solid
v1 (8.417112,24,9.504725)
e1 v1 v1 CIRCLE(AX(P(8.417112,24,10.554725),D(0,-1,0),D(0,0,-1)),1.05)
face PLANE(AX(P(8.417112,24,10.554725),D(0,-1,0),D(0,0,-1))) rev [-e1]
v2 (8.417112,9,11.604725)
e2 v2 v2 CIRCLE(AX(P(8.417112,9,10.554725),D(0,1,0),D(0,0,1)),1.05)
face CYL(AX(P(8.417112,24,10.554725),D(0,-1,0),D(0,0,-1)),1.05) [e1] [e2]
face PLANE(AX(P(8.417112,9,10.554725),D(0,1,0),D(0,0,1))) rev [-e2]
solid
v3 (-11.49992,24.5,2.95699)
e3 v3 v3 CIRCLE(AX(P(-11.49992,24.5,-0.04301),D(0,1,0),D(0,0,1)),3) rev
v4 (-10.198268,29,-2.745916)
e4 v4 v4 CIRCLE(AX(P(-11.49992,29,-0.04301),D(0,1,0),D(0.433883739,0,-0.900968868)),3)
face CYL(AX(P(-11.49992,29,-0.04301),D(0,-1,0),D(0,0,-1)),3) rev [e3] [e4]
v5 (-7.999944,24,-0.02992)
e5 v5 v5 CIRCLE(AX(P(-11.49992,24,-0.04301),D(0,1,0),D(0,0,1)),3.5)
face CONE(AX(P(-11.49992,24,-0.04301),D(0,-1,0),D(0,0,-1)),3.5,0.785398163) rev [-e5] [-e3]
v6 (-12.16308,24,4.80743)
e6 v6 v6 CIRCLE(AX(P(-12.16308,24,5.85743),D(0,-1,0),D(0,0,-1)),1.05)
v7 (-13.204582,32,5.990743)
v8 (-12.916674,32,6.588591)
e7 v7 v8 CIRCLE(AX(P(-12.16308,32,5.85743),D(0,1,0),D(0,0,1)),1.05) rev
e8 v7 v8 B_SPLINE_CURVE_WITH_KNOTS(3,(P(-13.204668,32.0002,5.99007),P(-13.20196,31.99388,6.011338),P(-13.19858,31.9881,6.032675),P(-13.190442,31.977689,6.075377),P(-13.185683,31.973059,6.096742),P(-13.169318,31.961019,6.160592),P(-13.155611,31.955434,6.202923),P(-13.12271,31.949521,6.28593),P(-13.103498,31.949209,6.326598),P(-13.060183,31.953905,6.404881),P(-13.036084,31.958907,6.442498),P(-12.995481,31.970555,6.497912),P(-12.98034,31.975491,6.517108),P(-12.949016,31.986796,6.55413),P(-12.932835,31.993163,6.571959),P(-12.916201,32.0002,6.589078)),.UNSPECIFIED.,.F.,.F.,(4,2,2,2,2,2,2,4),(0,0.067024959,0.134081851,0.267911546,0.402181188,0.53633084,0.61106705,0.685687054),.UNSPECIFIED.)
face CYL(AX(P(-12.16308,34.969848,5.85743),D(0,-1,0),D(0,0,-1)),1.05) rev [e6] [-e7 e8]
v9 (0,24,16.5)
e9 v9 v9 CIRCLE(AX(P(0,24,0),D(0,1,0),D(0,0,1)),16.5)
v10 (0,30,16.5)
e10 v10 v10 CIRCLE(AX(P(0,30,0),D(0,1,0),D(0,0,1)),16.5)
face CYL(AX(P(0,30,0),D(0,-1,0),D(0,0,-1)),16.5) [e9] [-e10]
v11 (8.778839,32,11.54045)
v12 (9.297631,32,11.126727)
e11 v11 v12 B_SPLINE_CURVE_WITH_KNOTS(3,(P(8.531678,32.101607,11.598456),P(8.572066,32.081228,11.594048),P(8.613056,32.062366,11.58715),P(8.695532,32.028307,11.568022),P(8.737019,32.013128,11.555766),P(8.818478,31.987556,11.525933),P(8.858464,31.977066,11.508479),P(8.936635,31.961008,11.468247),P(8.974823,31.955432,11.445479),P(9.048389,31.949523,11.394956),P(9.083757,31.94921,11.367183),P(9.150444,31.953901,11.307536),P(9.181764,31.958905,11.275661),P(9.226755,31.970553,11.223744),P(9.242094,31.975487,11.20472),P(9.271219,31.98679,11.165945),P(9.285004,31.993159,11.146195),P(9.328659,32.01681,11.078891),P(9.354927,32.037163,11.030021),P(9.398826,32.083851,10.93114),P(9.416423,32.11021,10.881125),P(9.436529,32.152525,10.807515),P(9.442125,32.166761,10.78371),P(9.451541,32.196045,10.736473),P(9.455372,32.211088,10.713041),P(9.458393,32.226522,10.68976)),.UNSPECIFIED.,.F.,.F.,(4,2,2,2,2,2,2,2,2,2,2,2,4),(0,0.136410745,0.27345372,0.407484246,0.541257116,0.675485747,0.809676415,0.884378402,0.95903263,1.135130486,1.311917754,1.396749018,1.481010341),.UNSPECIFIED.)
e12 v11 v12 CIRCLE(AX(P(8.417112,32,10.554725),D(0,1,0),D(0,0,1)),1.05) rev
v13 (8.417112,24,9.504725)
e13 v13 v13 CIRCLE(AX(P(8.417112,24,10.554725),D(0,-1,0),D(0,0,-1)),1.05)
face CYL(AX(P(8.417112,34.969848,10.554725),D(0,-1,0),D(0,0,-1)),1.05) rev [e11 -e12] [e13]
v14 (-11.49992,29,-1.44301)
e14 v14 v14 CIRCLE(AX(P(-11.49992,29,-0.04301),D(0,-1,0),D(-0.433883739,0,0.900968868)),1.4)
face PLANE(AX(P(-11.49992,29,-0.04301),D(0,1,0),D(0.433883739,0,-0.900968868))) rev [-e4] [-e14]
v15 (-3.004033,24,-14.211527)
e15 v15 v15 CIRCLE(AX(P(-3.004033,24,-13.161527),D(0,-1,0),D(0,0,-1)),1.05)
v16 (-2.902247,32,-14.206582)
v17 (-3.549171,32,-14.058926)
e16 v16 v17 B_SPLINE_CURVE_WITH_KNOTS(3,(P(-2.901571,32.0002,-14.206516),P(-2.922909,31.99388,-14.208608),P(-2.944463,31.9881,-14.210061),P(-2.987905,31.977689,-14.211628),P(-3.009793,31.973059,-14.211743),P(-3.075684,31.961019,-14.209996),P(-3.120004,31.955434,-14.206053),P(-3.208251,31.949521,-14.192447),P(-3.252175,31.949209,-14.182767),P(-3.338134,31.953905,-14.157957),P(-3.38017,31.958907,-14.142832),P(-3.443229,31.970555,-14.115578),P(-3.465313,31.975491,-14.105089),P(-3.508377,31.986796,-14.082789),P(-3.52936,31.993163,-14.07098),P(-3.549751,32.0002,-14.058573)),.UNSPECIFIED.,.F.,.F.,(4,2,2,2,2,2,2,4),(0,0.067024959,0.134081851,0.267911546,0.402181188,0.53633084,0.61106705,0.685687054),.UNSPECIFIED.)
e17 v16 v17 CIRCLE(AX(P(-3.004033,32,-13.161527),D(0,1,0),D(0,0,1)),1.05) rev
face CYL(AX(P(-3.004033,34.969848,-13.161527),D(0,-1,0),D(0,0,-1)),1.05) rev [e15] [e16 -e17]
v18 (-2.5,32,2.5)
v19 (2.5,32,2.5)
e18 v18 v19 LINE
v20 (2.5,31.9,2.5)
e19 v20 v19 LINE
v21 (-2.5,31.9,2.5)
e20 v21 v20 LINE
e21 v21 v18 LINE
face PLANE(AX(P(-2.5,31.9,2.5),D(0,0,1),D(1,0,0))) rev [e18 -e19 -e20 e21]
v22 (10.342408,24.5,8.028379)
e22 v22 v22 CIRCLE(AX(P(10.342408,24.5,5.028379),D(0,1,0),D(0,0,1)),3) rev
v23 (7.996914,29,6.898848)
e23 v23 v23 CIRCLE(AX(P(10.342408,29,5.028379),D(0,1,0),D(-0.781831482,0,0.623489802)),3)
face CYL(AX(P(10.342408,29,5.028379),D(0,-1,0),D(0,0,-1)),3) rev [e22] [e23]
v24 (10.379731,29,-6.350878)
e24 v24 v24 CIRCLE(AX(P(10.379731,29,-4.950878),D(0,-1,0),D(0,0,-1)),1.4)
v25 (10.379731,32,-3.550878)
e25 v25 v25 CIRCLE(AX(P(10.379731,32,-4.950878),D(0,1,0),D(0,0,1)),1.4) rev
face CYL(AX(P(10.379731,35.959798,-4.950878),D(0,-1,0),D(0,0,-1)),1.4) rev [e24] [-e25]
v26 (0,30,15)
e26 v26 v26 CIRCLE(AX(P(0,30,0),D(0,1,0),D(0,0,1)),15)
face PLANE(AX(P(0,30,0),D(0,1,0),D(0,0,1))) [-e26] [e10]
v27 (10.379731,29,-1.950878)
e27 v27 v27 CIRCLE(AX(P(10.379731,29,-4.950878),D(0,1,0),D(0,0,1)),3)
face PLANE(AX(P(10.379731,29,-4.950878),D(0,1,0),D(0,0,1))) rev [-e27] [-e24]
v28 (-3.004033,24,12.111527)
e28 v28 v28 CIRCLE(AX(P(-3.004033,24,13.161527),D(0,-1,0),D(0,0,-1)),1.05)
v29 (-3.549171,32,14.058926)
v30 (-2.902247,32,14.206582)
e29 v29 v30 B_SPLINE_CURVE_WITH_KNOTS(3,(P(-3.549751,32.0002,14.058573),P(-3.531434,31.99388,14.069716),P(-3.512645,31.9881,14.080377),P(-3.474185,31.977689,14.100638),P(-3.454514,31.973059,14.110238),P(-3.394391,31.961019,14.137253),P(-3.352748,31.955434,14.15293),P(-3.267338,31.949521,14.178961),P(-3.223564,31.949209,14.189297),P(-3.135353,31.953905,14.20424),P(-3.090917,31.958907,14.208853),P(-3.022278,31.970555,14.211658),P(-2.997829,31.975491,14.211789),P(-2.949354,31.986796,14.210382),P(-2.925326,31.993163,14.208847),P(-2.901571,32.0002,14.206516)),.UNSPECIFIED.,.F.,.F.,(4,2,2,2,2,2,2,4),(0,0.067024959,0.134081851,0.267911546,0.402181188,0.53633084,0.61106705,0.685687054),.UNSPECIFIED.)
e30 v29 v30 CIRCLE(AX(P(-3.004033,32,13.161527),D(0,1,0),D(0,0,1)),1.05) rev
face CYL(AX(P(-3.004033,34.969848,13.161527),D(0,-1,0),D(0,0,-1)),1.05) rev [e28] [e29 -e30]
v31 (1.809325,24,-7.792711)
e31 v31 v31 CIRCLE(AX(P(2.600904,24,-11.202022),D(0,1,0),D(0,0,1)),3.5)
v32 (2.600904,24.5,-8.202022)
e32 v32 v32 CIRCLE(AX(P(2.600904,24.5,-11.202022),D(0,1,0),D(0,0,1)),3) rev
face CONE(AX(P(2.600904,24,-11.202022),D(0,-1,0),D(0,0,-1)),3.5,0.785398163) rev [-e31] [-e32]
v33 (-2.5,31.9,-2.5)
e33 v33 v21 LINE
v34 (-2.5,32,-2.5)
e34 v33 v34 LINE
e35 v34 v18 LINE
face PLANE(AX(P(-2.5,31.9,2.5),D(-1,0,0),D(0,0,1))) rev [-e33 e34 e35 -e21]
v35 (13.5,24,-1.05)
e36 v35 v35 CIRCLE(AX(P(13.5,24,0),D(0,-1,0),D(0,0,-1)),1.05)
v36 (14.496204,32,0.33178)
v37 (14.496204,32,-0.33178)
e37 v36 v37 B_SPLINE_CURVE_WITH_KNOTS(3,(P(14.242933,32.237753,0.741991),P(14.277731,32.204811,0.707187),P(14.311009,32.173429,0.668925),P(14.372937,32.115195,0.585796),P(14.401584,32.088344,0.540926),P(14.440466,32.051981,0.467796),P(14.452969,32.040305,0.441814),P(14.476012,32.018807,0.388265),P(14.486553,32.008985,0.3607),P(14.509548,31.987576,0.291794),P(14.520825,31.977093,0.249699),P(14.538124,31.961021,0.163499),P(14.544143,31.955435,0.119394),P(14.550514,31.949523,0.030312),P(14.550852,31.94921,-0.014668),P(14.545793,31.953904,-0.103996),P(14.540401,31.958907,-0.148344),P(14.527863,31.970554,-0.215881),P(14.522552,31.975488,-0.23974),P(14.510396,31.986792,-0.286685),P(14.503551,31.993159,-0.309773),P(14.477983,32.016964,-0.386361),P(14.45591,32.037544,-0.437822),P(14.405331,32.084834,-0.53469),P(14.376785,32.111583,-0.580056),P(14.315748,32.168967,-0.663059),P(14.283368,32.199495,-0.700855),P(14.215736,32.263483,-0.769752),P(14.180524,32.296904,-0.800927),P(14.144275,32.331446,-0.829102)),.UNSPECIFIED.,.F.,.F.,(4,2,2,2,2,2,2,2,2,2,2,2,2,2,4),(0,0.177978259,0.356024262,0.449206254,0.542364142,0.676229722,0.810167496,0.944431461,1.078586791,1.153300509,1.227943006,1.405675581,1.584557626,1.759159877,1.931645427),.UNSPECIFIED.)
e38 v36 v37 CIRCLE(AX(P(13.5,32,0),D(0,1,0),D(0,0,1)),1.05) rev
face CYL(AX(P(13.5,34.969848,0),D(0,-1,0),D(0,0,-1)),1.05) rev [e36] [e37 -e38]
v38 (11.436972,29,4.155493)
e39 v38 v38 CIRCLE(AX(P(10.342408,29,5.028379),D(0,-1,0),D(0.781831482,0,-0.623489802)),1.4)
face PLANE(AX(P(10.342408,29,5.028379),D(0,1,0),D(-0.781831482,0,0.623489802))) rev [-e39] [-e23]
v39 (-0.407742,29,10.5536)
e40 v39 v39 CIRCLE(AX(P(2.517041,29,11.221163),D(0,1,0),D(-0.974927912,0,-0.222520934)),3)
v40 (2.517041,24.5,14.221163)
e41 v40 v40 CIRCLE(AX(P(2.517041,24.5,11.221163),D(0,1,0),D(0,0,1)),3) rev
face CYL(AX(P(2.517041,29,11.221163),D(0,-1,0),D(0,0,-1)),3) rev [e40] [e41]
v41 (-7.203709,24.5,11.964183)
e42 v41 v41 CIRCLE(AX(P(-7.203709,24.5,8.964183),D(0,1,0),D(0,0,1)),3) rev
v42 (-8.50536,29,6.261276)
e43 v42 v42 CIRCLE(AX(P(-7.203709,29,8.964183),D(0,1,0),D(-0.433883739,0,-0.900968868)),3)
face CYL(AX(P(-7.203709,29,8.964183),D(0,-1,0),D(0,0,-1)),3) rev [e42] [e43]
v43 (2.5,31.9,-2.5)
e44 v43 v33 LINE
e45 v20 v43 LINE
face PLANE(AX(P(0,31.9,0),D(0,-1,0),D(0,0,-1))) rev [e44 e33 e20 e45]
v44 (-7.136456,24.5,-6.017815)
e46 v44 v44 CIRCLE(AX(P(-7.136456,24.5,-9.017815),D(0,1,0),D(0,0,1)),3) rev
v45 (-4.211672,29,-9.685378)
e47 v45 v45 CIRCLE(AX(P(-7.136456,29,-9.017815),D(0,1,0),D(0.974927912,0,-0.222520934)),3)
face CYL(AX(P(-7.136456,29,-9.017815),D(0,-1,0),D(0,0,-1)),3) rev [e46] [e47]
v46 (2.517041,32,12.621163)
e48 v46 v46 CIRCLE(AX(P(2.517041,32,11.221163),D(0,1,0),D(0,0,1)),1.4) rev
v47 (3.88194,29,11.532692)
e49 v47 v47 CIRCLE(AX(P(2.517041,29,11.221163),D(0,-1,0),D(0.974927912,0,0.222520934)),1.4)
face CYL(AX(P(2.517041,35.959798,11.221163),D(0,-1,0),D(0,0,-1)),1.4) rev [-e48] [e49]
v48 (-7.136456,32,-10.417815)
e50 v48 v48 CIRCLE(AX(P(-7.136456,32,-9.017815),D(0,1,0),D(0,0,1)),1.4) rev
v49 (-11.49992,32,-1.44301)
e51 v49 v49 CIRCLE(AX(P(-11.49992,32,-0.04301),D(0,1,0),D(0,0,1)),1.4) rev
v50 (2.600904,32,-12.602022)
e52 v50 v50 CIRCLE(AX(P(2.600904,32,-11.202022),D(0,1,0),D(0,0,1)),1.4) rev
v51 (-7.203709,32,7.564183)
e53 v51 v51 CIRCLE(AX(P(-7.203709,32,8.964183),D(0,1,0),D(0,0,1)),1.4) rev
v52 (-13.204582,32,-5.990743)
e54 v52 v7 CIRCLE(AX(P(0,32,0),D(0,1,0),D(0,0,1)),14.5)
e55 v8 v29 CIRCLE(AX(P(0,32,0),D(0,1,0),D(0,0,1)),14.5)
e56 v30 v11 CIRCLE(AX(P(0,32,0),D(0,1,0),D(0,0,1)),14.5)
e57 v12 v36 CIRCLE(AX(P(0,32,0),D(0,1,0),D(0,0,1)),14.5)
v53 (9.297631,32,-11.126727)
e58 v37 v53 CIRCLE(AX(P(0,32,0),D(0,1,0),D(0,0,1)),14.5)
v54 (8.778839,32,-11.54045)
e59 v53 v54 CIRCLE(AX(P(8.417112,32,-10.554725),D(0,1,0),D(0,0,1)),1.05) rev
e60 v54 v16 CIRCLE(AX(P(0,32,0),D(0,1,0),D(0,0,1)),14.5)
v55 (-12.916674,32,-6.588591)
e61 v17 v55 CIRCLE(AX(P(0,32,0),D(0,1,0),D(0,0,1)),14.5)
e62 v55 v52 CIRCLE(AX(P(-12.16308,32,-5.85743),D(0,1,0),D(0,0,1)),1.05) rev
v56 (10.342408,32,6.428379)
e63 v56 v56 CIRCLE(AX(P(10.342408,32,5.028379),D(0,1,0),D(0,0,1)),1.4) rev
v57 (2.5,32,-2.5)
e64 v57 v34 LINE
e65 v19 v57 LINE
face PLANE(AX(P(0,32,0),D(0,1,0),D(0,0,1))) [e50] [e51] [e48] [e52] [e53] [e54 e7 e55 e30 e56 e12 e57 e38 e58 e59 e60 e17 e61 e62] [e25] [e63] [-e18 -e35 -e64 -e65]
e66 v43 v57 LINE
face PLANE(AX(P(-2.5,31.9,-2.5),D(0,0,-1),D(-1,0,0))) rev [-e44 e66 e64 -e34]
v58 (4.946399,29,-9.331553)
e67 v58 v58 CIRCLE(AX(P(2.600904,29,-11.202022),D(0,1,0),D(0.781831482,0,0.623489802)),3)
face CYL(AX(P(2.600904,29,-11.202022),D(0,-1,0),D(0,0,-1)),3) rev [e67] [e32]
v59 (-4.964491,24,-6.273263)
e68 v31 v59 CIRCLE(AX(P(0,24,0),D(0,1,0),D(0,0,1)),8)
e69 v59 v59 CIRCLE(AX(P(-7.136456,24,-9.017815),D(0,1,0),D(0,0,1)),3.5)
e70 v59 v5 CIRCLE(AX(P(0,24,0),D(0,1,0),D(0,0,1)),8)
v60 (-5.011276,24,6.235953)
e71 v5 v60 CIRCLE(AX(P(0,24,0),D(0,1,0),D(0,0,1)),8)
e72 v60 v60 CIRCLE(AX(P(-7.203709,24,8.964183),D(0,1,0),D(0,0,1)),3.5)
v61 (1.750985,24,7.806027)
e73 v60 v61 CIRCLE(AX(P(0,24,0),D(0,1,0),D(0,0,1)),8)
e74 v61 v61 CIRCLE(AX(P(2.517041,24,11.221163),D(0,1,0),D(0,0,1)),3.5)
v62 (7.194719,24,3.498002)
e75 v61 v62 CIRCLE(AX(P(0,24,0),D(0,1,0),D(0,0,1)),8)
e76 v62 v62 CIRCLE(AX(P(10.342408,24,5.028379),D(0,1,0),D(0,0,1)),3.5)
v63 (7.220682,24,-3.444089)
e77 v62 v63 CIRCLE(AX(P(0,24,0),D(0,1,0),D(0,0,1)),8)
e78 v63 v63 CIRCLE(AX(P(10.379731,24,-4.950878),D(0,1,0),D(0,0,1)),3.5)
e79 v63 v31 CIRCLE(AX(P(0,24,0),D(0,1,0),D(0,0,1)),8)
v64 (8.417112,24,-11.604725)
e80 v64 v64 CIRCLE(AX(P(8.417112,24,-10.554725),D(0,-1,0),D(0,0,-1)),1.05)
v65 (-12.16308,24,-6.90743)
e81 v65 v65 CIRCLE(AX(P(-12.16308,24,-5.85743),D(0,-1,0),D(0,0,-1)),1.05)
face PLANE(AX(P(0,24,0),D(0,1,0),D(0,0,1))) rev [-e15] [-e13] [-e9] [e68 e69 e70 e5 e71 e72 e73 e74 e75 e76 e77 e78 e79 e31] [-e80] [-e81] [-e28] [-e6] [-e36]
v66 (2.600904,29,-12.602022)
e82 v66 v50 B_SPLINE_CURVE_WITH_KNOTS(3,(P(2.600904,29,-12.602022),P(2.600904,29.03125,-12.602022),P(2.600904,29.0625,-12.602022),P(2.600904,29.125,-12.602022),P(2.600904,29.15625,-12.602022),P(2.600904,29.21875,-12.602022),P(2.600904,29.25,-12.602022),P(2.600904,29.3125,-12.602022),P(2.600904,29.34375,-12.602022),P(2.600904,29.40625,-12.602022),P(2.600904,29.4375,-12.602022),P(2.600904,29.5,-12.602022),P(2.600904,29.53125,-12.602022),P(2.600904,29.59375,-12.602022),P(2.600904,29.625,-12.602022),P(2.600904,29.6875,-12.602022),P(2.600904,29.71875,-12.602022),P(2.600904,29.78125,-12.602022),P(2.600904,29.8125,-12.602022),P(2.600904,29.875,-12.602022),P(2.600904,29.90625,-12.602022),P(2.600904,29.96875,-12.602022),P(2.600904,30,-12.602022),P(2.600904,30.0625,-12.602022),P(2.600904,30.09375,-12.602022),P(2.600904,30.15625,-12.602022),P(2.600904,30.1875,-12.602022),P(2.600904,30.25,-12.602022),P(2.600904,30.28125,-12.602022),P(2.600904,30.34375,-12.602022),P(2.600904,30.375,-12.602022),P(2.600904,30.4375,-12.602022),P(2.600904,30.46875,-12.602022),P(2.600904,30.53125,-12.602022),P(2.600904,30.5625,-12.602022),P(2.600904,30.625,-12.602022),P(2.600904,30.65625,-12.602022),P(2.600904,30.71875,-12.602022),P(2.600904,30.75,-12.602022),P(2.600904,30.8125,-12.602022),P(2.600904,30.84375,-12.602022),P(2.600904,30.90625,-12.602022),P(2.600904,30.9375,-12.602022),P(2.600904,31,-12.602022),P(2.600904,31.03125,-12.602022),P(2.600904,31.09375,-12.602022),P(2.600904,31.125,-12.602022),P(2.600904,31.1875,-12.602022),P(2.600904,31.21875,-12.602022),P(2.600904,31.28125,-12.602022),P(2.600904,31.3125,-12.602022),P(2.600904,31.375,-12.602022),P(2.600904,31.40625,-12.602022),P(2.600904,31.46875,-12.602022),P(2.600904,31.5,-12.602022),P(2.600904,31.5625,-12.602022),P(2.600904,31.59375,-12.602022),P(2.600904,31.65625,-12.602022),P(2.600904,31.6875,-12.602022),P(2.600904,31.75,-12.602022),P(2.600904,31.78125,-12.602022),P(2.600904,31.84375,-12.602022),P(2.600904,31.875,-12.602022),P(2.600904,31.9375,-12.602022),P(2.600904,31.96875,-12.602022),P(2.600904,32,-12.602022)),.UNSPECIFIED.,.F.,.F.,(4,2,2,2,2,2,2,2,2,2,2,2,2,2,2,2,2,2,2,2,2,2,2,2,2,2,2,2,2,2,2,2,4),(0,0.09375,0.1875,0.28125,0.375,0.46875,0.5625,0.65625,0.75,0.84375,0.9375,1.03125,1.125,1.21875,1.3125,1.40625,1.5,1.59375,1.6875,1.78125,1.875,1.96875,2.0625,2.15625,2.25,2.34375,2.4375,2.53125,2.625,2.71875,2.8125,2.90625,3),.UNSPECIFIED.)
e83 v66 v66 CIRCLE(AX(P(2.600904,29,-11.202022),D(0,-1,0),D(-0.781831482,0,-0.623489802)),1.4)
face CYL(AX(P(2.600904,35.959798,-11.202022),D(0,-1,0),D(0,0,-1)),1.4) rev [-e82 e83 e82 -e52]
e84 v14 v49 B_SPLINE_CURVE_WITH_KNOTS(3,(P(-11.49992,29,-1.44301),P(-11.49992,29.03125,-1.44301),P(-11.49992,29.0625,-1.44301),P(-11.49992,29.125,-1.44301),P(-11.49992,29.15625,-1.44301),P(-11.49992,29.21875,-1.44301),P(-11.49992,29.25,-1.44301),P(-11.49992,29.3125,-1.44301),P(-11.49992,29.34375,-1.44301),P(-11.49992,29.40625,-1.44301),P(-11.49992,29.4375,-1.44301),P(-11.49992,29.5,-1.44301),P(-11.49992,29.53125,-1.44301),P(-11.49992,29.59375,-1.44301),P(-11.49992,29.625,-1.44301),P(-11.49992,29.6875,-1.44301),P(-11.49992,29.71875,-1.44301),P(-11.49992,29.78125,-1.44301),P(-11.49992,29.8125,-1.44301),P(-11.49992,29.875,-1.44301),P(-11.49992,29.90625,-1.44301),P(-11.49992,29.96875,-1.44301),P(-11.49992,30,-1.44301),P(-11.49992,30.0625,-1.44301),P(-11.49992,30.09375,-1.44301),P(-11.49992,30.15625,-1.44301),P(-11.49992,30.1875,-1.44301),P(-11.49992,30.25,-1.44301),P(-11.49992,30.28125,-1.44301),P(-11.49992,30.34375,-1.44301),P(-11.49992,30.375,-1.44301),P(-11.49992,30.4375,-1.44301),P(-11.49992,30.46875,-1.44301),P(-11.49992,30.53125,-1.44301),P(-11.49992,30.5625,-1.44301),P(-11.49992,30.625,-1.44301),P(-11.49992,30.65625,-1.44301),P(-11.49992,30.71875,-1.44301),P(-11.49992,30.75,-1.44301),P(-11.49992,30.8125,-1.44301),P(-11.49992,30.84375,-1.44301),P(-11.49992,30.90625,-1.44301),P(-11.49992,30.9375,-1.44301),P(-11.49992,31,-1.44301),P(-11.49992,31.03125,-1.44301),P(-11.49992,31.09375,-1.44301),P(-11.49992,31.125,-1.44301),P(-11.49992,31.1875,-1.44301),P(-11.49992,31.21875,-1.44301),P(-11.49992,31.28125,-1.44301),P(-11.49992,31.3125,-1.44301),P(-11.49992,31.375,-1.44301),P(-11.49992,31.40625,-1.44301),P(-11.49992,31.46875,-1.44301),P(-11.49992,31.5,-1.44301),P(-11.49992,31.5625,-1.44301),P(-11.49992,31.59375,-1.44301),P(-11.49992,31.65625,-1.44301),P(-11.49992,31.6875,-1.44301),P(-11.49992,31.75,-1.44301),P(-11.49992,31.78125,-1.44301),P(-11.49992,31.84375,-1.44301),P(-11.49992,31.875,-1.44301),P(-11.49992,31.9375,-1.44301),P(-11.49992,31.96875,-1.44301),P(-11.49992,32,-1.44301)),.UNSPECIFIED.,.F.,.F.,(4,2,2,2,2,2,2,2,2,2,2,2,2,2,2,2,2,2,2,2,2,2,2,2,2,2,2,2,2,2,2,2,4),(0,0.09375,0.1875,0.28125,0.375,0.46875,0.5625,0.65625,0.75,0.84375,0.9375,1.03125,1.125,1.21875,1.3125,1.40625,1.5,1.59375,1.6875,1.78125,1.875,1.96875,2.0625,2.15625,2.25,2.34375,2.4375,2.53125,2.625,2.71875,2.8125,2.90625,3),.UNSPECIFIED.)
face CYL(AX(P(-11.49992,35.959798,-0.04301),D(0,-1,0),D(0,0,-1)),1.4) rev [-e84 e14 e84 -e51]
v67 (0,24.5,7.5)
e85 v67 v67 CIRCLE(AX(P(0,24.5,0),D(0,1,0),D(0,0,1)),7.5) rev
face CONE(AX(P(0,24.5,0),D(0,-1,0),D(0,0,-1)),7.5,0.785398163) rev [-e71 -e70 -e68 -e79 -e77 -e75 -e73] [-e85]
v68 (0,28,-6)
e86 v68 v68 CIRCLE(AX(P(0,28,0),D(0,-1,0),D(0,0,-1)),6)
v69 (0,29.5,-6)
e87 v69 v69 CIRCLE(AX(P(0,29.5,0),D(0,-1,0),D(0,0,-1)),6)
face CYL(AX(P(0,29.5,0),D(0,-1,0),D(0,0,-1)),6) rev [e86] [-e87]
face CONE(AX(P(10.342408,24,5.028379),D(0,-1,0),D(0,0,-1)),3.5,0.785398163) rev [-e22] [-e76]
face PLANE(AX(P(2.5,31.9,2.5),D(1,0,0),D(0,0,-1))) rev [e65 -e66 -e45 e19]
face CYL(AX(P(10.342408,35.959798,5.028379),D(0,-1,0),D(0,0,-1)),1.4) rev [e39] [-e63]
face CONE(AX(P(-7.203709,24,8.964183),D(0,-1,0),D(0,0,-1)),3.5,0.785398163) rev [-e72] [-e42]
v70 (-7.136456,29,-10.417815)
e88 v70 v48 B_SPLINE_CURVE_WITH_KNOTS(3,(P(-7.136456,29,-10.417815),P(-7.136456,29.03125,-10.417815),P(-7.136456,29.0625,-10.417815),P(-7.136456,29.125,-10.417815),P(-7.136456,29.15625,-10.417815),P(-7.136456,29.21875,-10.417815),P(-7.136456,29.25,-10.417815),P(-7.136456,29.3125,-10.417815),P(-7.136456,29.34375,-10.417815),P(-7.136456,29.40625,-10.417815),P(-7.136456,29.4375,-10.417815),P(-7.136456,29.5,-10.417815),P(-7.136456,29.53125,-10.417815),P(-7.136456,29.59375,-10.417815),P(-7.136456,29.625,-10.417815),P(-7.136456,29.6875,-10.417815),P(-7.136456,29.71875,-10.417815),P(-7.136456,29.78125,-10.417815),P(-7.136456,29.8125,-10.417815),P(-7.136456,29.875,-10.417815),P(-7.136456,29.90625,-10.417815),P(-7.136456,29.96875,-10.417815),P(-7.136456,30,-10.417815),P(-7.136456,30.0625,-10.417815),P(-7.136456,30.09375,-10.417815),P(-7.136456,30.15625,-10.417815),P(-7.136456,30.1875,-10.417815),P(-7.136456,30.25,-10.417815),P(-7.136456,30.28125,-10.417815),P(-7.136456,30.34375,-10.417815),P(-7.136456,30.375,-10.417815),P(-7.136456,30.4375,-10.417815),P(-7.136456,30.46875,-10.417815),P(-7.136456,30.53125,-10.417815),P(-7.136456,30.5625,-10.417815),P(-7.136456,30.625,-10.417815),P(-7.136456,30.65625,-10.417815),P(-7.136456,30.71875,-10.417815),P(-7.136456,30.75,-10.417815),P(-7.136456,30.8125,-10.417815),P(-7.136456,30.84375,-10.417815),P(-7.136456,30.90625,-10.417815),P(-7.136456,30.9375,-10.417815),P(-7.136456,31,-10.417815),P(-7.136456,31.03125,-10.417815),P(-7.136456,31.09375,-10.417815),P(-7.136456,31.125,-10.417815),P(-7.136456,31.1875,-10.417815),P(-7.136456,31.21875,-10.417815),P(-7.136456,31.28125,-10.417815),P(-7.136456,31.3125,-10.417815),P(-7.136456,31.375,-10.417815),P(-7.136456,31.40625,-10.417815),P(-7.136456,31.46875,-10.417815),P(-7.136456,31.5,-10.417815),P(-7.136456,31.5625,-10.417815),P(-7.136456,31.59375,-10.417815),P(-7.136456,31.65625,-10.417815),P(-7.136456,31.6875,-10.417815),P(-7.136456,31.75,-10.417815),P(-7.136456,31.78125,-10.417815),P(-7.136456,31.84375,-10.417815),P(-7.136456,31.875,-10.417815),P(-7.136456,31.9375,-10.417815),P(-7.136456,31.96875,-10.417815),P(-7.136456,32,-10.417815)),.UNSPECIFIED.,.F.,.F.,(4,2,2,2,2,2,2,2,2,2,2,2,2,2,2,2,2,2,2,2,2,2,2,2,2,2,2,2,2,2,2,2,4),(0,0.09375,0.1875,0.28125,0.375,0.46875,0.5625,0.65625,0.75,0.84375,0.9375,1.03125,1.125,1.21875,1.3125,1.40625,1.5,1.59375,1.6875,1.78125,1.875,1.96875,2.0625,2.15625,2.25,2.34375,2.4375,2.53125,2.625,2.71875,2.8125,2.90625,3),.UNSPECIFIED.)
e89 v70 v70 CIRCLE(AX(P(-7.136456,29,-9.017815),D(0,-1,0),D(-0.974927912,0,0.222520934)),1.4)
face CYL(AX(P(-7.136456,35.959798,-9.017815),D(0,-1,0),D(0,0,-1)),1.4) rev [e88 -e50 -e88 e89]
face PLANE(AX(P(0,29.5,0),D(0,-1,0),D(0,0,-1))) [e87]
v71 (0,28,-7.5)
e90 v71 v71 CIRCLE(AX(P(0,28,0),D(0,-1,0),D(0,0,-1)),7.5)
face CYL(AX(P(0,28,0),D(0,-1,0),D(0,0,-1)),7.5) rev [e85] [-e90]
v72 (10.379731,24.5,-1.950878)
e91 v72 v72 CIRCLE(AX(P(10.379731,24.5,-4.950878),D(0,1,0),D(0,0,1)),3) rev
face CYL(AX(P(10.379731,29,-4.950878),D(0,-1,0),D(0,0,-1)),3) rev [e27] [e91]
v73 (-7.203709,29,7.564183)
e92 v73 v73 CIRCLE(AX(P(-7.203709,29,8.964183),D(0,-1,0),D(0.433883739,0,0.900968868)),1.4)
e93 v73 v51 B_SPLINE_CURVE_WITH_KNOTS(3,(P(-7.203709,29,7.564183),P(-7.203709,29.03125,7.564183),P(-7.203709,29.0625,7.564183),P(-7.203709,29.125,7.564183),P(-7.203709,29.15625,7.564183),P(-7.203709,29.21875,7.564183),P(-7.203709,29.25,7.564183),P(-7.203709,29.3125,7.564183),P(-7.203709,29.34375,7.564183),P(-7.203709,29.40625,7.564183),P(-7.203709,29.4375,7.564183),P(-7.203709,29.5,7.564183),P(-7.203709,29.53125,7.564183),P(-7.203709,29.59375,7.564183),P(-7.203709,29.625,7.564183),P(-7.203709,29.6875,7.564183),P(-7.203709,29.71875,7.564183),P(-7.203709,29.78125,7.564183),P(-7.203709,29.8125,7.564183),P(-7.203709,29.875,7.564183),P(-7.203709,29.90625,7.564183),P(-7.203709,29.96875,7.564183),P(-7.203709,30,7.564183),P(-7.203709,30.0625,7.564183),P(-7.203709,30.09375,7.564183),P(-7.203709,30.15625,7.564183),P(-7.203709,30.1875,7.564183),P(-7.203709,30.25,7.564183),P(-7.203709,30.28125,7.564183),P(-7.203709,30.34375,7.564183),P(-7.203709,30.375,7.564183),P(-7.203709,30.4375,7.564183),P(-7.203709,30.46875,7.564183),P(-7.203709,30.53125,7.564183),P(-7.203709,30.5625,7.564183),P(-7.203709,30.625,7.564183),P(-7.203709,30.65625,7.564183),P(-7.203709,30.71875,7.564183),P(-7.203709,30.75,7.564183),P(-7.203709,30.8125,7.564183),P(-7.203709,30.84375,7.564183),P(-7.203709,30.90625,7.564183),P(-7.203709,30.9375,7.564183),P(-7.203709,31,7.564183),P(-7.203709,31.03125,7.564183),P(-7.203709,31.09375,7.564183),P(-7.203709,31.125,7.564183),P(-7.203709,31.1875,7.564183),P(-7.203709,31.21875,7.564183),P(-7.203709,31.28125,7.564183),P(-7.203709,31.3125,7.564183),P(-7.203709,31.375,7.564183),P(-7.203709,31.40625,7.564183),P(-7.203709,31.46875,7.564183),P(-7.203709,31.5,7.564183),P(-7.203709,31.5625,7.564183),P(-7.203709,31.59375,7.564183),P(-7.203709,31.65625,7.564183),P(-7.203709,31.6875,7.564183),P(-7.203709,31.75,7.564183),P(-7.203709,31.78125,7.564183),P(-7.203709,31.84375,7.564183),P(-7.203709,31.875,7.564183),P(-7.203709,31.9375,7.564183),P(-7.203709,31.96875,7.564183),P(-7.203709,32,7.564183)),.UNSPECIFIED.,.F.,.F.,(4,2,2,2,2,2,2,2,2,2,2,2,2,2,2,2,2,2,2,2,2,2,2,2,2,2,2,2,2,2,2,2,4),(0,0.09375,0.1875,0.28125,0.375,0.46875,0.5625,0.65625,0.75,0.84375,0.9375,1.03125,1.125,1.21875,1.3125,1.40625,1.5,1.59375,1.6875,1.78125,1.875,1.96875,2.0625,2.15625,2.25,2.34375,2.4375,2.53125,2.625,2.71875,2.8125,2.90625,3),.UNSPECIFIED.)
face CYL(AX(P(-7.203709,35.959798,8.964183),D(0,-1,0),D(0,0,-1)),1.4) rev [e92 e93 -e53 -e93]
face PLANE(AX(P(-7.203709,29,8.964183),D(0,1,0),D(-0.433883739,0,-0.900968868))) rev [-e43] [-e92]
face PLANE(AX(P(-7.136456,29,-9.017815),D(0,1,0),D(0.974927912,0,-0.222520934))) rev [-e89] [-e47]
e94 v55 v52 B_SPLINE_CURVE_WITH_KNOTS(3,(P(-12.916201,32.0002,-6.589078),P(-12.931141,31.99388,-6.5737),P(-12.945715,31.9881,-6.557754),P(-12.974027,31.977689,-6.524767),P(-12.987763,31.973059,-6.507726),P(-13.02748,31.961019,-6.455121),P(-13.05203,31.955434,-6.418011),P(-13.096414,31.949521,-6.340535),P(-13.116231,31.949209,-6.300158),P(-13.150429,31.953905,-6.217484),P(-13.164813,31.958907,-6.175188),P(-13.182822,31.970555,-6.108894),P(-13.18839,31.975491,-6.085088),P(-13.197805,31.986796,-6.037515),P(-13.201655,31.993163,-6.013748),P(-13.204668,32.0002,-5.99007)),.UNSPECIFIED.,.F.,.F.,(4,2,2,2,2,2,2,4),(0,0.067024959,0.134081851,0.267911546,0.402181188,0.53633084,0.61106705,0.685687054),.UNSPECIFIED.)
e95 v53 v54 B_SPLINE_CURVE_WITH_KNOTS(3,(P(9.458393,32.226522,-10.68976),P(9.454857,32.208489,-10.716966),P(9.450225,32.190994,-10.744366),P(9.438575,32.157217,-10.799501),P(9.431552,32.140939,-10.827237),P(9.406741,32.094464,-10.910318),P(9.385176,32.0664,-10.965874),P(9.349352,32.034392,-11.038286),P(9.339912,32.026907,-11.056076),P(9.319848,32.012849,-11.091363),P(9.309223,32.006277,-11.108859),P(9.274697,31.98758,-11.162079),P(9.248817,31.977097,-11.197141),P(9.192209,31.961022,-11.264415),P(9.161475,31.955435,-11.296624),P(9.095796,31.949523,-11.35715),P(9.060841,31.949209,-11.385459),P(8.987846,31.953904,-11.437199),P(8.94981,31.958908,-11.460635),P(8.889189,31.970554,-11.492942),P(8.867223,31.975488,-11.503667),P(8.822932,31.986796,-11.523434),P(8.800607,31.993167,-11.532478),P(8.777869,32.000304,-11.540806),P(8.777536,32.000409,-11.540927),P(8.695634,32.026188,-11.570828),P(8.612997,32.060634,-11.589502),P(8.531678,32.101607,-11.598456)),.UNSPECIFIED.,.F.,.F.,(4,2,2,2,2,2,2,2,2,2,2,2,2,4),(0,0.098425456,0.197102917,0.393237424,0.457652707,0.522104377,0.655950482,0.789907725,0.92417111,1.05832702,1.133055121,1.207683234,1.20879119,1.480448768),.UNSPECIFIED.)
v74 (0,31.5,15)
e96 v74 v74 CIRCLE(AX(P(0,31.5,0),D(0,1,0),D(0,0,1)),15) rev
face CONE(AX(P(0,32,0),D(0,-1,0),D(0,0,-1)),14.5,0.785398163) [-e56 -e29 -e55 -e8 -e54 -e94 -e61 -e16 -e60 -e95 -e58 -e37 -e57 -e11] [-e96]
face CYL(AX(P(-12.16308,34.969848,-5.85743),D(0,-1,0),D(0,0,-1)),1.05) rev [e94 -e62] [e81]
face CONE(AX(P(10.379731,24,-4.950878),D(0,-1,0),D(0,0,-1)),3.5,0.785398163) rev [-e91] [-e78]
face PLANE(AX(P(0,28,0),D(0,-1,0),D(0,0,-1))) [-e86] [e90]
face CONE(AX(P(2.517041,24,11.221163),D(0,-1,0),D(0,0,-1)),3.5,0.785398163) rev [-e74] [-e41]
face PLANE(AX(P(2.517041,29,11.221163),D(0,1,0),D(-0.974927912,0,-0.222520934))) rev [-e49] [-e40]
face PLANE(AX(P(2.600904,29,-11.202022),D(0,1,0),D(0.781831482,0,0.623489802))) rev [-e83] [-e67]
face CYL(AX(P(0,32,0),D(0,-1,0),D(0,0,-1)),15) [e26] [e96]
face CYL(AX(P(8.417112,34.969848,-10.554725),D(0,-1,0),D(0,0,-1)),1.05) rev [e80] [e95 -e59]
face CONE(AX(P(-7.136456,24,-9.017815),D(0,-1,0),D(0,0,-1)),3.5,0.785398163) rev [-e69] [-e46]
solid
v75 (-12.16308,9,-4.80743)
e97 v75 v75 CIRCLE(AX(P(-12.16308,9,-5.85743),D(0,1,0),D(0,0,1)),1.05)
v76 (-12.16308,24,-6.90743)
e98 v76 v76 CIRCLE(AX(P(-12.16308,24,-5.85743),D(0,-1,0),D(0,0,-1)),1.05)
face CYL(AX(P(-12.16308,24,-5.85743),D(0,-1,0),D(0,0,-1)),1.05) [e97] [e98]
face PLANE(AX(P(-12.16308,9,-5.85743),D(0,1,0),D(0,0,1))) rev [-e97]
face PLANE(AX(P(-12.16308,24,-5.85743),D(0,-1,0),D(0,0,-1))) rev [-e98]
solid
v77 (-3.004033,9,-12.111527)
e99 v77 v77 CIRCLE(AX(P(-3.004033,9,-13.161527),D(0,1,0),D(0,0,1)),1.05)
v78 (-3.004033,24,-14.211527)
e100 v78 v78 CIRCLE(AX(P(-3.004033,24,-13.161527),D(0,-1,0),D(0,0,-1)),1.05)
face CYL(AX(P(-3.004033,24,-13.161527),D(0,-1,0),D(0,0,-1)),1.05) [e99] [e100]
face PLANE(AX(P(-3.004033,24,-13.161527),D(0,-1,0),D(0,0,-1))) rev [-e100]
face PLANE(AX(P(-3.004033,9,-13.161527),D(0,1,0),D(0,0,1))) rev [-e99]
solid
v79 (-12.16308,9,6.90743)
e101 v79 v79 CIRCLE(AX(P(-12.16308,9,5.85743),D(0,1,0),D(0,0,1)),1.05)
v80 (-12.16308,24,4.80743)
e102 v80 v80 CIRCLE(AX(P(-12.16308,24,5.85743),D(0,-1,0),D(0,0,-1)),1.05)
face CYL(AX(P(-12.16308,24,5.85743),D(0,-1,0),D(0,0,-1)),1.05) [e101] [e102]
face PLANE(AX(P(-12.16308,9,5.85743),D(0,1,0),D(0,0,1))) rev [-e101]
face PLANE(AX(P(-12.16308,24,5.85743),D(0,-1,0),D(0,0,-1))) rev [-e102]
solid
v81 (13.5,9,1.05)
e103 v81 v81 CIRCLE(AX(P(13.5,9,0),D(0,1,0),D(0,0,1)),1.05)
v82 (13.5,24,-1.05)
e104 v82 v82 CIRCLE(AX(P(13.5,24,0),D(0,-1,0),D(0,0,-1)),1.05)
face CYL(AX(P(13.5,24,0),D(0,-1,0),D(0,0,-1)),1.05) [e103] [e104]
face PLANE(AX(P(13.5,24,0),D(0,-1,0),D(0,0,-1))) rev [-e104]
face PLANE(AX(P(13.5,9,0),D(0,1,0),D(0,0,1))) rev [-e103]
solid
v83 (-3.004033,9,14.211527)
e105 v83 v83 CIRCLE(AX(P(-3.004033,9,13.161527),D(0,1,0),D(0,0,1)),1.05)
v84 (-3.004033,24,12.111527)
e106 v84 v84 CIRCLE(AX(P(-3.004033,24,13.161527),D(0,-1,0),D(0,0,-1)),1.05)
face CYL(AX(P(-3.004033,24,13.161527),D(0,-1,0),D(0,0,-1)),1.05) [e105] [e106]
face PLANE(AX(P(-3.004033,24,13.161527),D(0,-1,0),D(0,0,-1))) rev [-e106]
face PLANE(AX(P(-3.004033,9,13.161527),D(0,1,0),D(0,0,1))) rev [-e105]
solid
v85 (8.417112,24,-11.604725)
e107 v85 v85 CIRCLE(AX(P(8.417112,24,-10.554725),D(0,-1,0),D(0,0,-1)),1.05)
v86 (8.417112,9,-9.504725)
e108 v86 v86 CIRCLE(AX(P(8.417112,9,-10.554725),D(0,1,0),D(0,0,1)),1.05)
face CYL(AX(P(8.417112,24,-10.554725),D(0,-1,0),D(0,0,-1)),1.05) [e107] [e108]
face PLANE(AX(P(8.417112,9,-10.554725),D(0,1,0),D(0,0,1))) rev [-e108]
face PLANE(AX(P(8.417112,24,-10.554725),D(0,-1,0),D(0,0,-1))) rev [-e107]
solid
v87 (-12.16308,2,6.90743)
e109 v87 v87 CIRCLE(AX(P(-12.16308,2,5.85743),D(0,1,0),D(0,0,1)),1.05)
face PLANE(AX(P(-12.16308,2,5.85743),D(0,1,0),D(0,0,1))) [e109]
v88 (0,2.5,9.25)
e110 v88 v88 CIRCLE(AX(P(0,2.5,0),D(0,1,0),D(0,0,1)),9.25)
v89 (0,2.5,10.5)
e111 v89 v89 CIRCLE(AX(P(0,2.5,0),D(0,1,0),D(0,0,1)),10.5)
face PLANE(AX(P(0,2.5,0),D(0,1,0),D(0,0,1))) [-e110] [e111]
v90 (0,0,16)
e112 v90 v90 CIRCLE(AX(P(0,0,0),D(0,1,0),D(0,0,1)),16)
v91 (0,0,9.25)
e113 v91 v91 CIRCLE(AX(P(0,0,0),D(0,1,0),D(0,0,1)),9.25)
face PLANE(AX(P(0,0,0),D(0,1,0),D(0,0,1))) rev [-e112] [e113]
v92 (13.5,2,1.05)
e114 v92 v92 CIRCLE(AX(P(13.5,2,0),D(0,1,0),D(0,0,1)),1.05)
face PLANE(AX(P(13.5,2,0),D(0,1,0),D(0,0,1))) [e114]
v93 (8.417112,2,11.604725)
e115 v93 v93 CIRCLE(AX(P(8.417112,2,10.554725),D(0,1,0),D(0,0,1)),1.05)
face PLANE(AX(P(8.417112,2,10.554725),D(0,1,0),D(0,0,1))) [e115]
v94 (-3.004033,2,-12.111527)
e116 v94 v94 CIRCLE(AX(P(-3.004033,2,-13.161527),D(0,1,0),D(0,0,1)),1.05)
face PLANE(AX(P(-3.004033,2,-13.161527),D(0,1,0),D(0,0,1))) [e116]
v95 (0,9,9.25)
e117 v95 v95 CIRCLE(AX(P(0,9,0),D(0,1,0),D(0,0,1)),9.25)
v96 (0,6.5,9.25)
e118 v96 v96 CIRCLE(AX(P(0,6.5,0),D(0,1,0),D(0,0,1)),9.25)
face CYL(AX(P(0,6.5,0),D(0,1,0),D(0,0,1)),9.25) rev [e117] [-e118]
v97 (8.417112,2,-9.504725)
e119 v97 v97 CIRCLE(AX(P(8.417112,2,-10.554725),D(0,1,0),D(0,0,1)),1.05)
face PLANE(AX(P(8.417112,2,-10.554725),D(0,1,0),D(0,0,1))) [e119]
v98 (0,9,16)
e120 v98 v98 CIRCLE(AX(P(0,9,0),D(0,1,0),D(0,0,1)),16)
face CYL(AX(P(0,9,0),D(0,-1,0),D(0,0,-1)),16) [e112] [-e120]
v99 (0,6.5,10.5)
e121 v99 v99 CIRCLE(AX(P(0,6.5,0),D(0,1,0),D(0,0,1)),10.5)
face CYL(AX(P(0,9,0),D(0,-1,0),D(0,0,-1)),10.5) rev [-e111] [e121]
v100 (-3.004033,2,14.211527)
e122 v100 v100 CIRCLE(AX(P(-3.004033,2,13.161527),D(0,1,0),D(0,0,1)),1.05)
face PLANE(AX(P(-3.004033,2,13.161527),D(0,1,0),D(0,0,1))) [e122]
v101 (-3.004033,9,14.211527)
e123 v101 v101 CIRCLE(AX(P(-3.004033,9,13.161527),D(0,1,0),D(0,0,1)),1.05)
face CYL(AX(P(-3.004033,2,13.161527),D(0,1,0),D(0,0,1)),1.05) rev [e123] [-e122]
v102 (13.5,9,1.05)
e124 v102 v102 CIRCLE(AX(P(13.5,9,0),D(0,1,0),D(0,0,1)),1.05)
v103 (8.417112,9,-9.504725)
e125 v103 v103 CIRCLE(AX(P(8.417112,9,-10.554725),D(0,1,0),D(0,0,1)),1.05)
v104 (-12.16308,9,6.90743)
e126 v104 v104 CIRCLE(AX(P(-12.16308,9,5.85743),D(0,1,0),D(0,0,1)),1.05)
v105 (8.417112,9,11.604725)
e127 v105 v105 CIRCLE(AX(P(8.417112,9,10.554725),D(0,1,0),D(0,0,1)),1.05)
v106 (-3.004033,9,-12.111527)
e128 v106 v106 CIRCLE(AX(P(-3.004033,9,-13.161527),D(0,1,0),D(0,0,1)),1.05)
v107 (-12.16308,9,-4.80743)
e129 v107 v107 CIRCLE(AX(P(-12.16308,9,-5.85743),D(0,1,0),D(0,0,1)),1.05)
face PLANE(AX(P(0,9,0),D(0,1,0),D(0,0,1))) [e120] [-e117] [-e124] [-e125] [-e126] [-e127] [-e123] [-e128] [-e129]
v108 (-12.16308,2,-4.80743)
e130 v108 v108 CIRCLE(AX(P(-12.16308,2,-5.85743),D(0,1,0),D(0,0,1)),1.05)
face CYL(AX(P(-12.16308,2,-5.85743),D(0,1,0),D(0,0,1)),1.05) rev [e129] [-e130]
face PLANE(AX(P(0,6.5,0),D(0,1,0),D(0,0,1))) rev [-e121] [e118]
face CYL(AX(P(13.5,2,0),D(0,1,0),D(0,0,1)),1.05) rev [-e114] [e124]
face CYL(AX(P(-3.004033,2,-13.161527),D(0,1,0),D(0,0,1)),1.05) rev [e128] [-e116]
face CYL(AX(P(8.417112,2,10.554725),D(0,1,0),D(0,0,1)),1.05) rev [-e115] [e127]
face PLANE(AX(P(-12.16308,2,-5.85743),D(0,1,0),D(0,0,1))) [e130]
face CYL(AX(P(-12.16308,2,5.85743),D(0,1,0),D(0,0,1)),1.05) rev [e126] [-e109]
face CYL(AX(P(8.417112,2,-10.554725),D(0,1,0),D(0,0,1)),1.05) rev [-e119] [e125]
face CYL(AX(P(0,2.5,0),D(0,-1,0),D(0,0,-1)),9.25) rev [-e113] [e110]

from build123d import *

# Parameters (mm, degrees)
SKETCH1_R           = 16
SKETCH1_R_2         = 10.5
BOSS_EXTRUDE1_DEPTH = 9
SKETCH2_R           = 1.05
BOSS_EXTRUDE2_DEPTH = 15
BOSS_EXTRUDE3_START = -2.5
SKETCH3_R           = 10.5
SKETCH3_R_2         = 9.25
BOSS_EXTRUDE3_DEPTH = 2.5
BOSS_EXTRUDE4_START = -9
SKETCH3_3_R         = 10.5
SKETCH3_3_R_2       = 9.25
BOSS_EXTRUDE4_DEPTH = 2.5
SKETCH4_R           = 16.5
BOSS_EXTRUDE5_DEPTH = 6
SKETCH6_R           = 15
BOSS_EXTRUDE6_DEPTH = 2
SKETCH8_R           = 7.5
CUT_EXTRUDE1_DEPTH  = 4
CHAMFER1_SIZE       = 0.5
SKETCH9_R           = 6
CUT_EXTRUDE2_DEPTH  = 1.5
CHAMFER2_SIZE       = 0.5
CUT_EXTRUDE3_START  = -7
SKETCH10_R          = 1.05
CUT_EXTRUDE3_DEPTH  = 7
SKETCH11_R          = 1.05
CUT_EXTRUDE4_DEPTH  = 8
SKETCH12_R          = 3
CUT_EXTRUDE5_DEPTH  = 5
SKETCH13_R          = 1.4
CUT_EXTRUDE6_DEPTH  = 3
CIRPATTERN1_COUNT   = 7
CHAMFER3_SIZE       = 0.5
SKETCH14_W          = 5
SKETCH14_H          = 5
CUT_EXTRUDE7_DEPTH  = 0.1


with BuildPart() as part:
    # Sketch1 → Boss-Extrude1 (new body)
    with BuildSketch(Plane(origin=(0, 0, 0), x_dir=(1, 0, 0), z_dir=(0, 1, 0))):
        with Locations(Location((0, 0, 0), (0, 0, 270))):
            Circle(SKETCH1_R)
        with Locations(Location((0, 0, 0), (0, 0, 270))):
            Circle(SKETCH1_R_2, mode=Mode.SUBTRACT)
    extrude(amount=BOSS_EXTRUDE1_DEPTH)

    # Sketch2 → Boss-Extrude2 (add)
    with BuildSketch(Plane(origin=(0, 9, 0), x_dir=(1, 0, 0), z_dir=(0, 1, 0))):
        with Locations(Location((13.5, 0, 0), (0, 0, 270))):
            Circle(SKETCH2_R)
        with Locations(Location((8.417112325, -10.554725013, 0), (0, 0, 270))):
            Circle(SKETCH2_R)
        with Locations(Location((-3.004032608, -13.161526814, 0), (0, 0, 270))):
            Circle(SKETCH2_R)
        with Locations(Location((-12.163079717, -5.857430478, 0), (0, 0, 270))):
            Circle(SKETCH2_R)
        with Locations(Location((-12.163079717, 5.857430478, 0), (0, 0, 270))):
            Circle(SKETCH2_R)
        with Locations(Location((-3.004032608, 13.161526814, 0), (0, 0, 270))):
            Circle(SKETCH2_R)
        with Locations(Location((8.417112325, 10.554725013, 0), (0, 0, 270))):
            Circle(SKETCH2_R)
    extrude(amount=BOSS_EXTRUDE2_DEPTH)

    # Sketch3 → Boss-Extrude3 (add)
    with BuildSketch(Plane(origin=(0, 9, 0), x_dir=(1, 0, 0), z_dir=(0, 1, 0)).offset(BOSS_EXTRUDE3_START)):
        with Locations(Location((0, 0, 0), (0, 0, 270))):
            Circle(SKETCH3_R)
        with Locations(Location((0, 0, 0), (0, 0, 270))):
            Circle(SKETCH3_R_2, mode=Mode.SUBTRACT)
    extrude(amount=BOSS_EXTRUDE3_DEPTH)

    # Sketch3<3> → Boss-Extrude4 (add)
    with BuildSketch(Plane(origin=(0, 9, 0), x_dir=(1, 0, 0), z_dir=(0, 1, 0)).offset(BOSS_EXTRUDE4_START)):
        with Locations(Location((0, 0, 0), (0, 0, 270))):
            Circle(SKETCH3_3_R)
        with Locations(Location((0, 0, 0), (0, 0, 270))):
            Circle(SKETCH3_3_R_2, mode=Mode.SUBTRACT)
    extrude(amount=BOSS_EXTRUDE4_DEPTH)

    # Sketch4 → Boss-Extrude5 (add)
    with BuildSketch(Plane(origin=(0, 24, 0), x_dir=(1, 0, 0), z_dir=(0, 1, 0))):
        with Locations(Location((0, 0, 0), (0, 0, 270))):
            Circle(SKETCH4_R)
    extrude(amount=BOSS_EXTRUDE5_DEPTH)

    # Sketch6 → Boss-Extrude6 (add)
    with BuildSketch(Plane(origin=(0, 30, 0), x_dir=(1, 0, 0), z_dir=(0, 1, 0))):
        with Locations(Location((0, 0, 0), (0, 0, 270))):
            Circle(SKETCH6_R)
    extrude(amount=BOSS_EXTRUDE6_DEPTH)

    # Sketch8 → Cut-Extrude1 (cut)
    with BuildSketch(Plane.XZ.offset(-24)):
        with Locations(Location((0, 0, 0), (0, 0, 270))):
            Circle(SKETCH8_R)
    extrude(amount=-CUT_EXTRUDE1_DEPTH, mode=Mode.SUBTRACT)

    # Chamfer1
    chamfer1_edges = [part.edges().sort_by_distance(p)[0] for p in [
        (0, 24, 7.5),
    ]]
    chamfer(chamfer1_edges, length=CHAMFER1_SIZE)

    # Sketch9 → Cut-Extrude2 (cut)
    with BuildSketch(Plane.XZ.offset(-28)):
        with Locations(Location((0, 0, 0), (0, 0, 270))):
            Circle(SKETCH9_R)
    extrude(amount=-CUT_EXTRUDE2_DEPTH, mode=Mode.SUBTRACT)

    # Chamfer2
    chamfer2_edges = [part.edges().sort_by_distance(p)[0] for p in [
        (0, 32, -15),
    ]]
    chamfer(chamfer2_edges, length=CHAMFER2_SIZE)

    # Sketch10 → Cut-Extrude3 (cut)
    with BuildSketch(Plane(origin=(0, 9, 0), x_dir=(1, 0, 0), z_dir=(0, 1, 0)).offset(CUT_EXTRUDE3_START)):
        with Locations(Location((8.417112325, -10.554725013, 0), (0, 0, 270))):
            Circle(SKETCH10_R)
        with Locations(Location((13.5, 0, 0), (0, 0, 270))):
            Circle(SKETCH10_R)
        with Locations(Location((8.417112325, 10.554725013, 0), (0, 0, 270))):
            Circle(SKETCH10_R)
        with Locations(Location((-3.004032608, 13.161526814, 0), (0, 0, 270))):
            Circle(SKETCH10_R)
        with Locations(Location((-12.163079717, 5.857430478, 0), (0, 0, 270))):
            Circle(SKETCH10_R)
        with Locations(Location((-12.163079717, -5.857430478, 0), (0, 0, 270))):
            Circle(SKETCH10_R)
        with Locations(Location((-3.004032608, -13.161526814, 0), (0, 0, 270))):
            Circle(SKETCH10_R)
    extrude(amount=CUT_EXTRUDE3_DEPTH, mode=Mode.SUBTRACT)


with BuildPart() as cut_extrude3_piece_1:
    # of the separate pieces the step leaves, piece 1, a body of its own (cut_extrude3_pieces)
    add(part.part.solids().sort_by_distance((0, 31.5, 15))[0])

    # Sketch11 → Cut-Extrude4 (cut)
    with BuildSketch(Plane.XZ.offset(-24)):
        with Locations(Location((8.417112325, -10.554725013, 0), (0, 0, 270))):
            Circle(SKETCH11_R)
        with Locations(Location((-3.004032608, -13.161526814, 0), (0, 0, 270))):
            Circle(SKETCH11_R)
        with Locations(Location((-12.163079717, -5.857430478, 0), (0, 0, 270))):
            Circle(SKETCH11_R)
        with Locations(Location((-12.163079717, 5.857430478, 0), (0, 0, 270))):
            Circle(SKETCH11_R)
        with Locations(Location((-3.004032608, 13.161526814, 0), (0, 0, 270))):
            Circle(SKETCH11_R)
        with Locations(Location((8.417112325, 10.554725013, 0), (0, 0, 270))):
            Circle(SKETCH11_R)
        with Locations(Location((13.5, 0, 0), (0, 0, 270))):
            Circle(SKETCH11_R)
    extrude(amount=-CUT_EXTRUDE4_DEPTH, mode=Mode.SUBTRACT)


with BuildPart() as cut_extrude3_piece_2:
    # of the separate pieces the step leaves, piece 2, a body of its own (cut_extrude3_pieces)
    add(part.part.solids().sort_by_distance((0, 9, 16))[0])


with BuildPart() as cut_extrude4_piece_1:
    # of the separate pieces the step leaves, piece 1, a body of its own (cut_extrude4_pieces)
    add(cut_extrude3_piece_1.part.solids().sort_by_distance((0, 31.5, 15))[0])

    # Sketch12 → Cut-Extrude5 (cut)
    with BuildSketch(Plane(origin=(0, 24, 0), x_dir=(1, 0, 0), z_dir=(0, 1, 0))):
        with Locations(Location((10.37973077, 4.950877613, 0), (0, 0, 270))):
            Circle(SKETCH12_R)
    cut_extrude5 = extrude(amount=CUT_EXTRUDE5_DEPTH, mode=Mode.SUBTRACT)

    # Sketch13 → Cut-Extrude6 (cut)
    with BuildSketch(Plane.XZ.offset(-29)):
        with Locations(Location((10.37973077, -4.950877613, 0), (0, 0, 270))):
            Circle(SKETCH13_R)
    cut_extrude6 = extrude(amount=-CUT_EXTRUDE6_DEPTH, mode=Mode.SUBTRACT)

    # CirPattern1: Cut-Extrude5, Cut-Extrude6 ×7 about axis
    cirpattern1_axis = Axis((0, 0, 0), (0, 1, 0))
    add([cut_extrude5.rotate(cirpattern1_axis, i * 360 / CIRPATTERN1_COUNT) for i in range(1, CIRPATTERN1_COUNT)], mode=Mode.SUBTRACT)
    add([cut_extrude6.rotate(cirpattern1_axis, i * 360 / CIRPATTERN1_COUNT) for i in range(1, CIRPATTERN1_COUNT)], mode=Mode.SUBTRACT)

    # Chamfer3
    chamfer3_edges = [cut_extrude4_piece_1.edges().sort_by_distance(p)[0] for p in [
        (10.37973077, 24, -7.950877613),
        (12.687902712, 24, 3.157909188),
        (5.441825126, 24, 11.888725961),
        (-5.902057773, 24, 11.6670896),
        (-12.801570789, 24, 2.659896805),
        (-10.061239897, 24, -8.350252536),
        (0.25540985, 24, -13.072491403),
    ]]
    chamfer(chamfer3_edges, length=CHAMFER3_SIZE - 0.0001)  # a hair under: the kernel refuses the full size

    # Sketch14 → Cut-Extrude7 (cut)
    with BuildSketch(Plane(origin=(0, 32, 0), x_dir=(1, 0, 0), z_dir=(0, 1, 0))):
        Rectangle(SKETCH14_W, SKETCH14_H)
    extrude(amount=-CUT_EXTRUDE7_DEPTH, mode=Mode.SUBTRACT)


with BuildPart() as cut_extrude4_piece_2:
    # of the separate pieces the step leaves, piece 2, a body of its own (cut_extrude4_pieces)
    add(cut_extrude3_piece_1.part.solids().sort_by_distance((8.417112325, 9, -9.504725013))[0])


with BuildPart() as cut_extrude4_piece_3:
    # of the separate pieces the step leaves, piece 3, a body of its own (cut_extrude4_pieces)
    add(cut_extrude3_piece_1.part.solids().sort_by_distance((-3.004032608, 9, 14.211526814))[0])


with BuildPart() as cut_extrude4_piece_4:
    # of the separate pieces the step leaves, piece 4, a body of its own (cut_extrude4_pieces)
    add(cut_extrude3_piece_1.part.solids().sort_by_distance((-12.163079717, 9, -4.807430478))[0])


with BuildPart() as cut_extrude4_piece_5:
    # of the separate pieces the step leaves, piece 5, a body of its own (cut_extrude4_pieces)
    add(cut_extrude3_piece_1.part.solids().sort_by_distance((8.417112325, 9, 11.604725013))[0])


with BuildPart() as cut_extrude4_piece_6:
    # of the separate pieces the step leaves, piece 6, a body of its own (cut_extrude4_pieces)
    add(cut_extrude3_piece_1.part.solids().sort_by_distance((-12.163079717, 9, 6.907430478))[0])


with BuildPart() as cut_extrude4_piece_7:
    # of the separate pieces the step leaves, piece 7, a body of its own (cut_extrude4_pieces)
    add(cut_extrude3_piece_1.part.solids().sort_by_distance((-3.004032608, 9, -12.111526814))[0])


with BuildPart() as cut_extrude4_piece_8:
    # of the separate pieces the step leaves, piece 8, a body of its own (cut_extrude4_pieces)
    add(cut_extrude3_piece_1.part.solids().sort_by_distance((13.5, 9, 1.05))[0])


solid = Compound([cut_extrude3_piece_2.part, cut_extrude4_piece_1.part, cut_extrude4_piece_2.part, cut_extrude4_piece_3.part, cut_extrude4_piece_4.part, cut_extrude4_piece_5.part, cut_extrude4_piece_6.part, cut_extrude4_piece_7.part, cut_extrude4_piece_8.part])
